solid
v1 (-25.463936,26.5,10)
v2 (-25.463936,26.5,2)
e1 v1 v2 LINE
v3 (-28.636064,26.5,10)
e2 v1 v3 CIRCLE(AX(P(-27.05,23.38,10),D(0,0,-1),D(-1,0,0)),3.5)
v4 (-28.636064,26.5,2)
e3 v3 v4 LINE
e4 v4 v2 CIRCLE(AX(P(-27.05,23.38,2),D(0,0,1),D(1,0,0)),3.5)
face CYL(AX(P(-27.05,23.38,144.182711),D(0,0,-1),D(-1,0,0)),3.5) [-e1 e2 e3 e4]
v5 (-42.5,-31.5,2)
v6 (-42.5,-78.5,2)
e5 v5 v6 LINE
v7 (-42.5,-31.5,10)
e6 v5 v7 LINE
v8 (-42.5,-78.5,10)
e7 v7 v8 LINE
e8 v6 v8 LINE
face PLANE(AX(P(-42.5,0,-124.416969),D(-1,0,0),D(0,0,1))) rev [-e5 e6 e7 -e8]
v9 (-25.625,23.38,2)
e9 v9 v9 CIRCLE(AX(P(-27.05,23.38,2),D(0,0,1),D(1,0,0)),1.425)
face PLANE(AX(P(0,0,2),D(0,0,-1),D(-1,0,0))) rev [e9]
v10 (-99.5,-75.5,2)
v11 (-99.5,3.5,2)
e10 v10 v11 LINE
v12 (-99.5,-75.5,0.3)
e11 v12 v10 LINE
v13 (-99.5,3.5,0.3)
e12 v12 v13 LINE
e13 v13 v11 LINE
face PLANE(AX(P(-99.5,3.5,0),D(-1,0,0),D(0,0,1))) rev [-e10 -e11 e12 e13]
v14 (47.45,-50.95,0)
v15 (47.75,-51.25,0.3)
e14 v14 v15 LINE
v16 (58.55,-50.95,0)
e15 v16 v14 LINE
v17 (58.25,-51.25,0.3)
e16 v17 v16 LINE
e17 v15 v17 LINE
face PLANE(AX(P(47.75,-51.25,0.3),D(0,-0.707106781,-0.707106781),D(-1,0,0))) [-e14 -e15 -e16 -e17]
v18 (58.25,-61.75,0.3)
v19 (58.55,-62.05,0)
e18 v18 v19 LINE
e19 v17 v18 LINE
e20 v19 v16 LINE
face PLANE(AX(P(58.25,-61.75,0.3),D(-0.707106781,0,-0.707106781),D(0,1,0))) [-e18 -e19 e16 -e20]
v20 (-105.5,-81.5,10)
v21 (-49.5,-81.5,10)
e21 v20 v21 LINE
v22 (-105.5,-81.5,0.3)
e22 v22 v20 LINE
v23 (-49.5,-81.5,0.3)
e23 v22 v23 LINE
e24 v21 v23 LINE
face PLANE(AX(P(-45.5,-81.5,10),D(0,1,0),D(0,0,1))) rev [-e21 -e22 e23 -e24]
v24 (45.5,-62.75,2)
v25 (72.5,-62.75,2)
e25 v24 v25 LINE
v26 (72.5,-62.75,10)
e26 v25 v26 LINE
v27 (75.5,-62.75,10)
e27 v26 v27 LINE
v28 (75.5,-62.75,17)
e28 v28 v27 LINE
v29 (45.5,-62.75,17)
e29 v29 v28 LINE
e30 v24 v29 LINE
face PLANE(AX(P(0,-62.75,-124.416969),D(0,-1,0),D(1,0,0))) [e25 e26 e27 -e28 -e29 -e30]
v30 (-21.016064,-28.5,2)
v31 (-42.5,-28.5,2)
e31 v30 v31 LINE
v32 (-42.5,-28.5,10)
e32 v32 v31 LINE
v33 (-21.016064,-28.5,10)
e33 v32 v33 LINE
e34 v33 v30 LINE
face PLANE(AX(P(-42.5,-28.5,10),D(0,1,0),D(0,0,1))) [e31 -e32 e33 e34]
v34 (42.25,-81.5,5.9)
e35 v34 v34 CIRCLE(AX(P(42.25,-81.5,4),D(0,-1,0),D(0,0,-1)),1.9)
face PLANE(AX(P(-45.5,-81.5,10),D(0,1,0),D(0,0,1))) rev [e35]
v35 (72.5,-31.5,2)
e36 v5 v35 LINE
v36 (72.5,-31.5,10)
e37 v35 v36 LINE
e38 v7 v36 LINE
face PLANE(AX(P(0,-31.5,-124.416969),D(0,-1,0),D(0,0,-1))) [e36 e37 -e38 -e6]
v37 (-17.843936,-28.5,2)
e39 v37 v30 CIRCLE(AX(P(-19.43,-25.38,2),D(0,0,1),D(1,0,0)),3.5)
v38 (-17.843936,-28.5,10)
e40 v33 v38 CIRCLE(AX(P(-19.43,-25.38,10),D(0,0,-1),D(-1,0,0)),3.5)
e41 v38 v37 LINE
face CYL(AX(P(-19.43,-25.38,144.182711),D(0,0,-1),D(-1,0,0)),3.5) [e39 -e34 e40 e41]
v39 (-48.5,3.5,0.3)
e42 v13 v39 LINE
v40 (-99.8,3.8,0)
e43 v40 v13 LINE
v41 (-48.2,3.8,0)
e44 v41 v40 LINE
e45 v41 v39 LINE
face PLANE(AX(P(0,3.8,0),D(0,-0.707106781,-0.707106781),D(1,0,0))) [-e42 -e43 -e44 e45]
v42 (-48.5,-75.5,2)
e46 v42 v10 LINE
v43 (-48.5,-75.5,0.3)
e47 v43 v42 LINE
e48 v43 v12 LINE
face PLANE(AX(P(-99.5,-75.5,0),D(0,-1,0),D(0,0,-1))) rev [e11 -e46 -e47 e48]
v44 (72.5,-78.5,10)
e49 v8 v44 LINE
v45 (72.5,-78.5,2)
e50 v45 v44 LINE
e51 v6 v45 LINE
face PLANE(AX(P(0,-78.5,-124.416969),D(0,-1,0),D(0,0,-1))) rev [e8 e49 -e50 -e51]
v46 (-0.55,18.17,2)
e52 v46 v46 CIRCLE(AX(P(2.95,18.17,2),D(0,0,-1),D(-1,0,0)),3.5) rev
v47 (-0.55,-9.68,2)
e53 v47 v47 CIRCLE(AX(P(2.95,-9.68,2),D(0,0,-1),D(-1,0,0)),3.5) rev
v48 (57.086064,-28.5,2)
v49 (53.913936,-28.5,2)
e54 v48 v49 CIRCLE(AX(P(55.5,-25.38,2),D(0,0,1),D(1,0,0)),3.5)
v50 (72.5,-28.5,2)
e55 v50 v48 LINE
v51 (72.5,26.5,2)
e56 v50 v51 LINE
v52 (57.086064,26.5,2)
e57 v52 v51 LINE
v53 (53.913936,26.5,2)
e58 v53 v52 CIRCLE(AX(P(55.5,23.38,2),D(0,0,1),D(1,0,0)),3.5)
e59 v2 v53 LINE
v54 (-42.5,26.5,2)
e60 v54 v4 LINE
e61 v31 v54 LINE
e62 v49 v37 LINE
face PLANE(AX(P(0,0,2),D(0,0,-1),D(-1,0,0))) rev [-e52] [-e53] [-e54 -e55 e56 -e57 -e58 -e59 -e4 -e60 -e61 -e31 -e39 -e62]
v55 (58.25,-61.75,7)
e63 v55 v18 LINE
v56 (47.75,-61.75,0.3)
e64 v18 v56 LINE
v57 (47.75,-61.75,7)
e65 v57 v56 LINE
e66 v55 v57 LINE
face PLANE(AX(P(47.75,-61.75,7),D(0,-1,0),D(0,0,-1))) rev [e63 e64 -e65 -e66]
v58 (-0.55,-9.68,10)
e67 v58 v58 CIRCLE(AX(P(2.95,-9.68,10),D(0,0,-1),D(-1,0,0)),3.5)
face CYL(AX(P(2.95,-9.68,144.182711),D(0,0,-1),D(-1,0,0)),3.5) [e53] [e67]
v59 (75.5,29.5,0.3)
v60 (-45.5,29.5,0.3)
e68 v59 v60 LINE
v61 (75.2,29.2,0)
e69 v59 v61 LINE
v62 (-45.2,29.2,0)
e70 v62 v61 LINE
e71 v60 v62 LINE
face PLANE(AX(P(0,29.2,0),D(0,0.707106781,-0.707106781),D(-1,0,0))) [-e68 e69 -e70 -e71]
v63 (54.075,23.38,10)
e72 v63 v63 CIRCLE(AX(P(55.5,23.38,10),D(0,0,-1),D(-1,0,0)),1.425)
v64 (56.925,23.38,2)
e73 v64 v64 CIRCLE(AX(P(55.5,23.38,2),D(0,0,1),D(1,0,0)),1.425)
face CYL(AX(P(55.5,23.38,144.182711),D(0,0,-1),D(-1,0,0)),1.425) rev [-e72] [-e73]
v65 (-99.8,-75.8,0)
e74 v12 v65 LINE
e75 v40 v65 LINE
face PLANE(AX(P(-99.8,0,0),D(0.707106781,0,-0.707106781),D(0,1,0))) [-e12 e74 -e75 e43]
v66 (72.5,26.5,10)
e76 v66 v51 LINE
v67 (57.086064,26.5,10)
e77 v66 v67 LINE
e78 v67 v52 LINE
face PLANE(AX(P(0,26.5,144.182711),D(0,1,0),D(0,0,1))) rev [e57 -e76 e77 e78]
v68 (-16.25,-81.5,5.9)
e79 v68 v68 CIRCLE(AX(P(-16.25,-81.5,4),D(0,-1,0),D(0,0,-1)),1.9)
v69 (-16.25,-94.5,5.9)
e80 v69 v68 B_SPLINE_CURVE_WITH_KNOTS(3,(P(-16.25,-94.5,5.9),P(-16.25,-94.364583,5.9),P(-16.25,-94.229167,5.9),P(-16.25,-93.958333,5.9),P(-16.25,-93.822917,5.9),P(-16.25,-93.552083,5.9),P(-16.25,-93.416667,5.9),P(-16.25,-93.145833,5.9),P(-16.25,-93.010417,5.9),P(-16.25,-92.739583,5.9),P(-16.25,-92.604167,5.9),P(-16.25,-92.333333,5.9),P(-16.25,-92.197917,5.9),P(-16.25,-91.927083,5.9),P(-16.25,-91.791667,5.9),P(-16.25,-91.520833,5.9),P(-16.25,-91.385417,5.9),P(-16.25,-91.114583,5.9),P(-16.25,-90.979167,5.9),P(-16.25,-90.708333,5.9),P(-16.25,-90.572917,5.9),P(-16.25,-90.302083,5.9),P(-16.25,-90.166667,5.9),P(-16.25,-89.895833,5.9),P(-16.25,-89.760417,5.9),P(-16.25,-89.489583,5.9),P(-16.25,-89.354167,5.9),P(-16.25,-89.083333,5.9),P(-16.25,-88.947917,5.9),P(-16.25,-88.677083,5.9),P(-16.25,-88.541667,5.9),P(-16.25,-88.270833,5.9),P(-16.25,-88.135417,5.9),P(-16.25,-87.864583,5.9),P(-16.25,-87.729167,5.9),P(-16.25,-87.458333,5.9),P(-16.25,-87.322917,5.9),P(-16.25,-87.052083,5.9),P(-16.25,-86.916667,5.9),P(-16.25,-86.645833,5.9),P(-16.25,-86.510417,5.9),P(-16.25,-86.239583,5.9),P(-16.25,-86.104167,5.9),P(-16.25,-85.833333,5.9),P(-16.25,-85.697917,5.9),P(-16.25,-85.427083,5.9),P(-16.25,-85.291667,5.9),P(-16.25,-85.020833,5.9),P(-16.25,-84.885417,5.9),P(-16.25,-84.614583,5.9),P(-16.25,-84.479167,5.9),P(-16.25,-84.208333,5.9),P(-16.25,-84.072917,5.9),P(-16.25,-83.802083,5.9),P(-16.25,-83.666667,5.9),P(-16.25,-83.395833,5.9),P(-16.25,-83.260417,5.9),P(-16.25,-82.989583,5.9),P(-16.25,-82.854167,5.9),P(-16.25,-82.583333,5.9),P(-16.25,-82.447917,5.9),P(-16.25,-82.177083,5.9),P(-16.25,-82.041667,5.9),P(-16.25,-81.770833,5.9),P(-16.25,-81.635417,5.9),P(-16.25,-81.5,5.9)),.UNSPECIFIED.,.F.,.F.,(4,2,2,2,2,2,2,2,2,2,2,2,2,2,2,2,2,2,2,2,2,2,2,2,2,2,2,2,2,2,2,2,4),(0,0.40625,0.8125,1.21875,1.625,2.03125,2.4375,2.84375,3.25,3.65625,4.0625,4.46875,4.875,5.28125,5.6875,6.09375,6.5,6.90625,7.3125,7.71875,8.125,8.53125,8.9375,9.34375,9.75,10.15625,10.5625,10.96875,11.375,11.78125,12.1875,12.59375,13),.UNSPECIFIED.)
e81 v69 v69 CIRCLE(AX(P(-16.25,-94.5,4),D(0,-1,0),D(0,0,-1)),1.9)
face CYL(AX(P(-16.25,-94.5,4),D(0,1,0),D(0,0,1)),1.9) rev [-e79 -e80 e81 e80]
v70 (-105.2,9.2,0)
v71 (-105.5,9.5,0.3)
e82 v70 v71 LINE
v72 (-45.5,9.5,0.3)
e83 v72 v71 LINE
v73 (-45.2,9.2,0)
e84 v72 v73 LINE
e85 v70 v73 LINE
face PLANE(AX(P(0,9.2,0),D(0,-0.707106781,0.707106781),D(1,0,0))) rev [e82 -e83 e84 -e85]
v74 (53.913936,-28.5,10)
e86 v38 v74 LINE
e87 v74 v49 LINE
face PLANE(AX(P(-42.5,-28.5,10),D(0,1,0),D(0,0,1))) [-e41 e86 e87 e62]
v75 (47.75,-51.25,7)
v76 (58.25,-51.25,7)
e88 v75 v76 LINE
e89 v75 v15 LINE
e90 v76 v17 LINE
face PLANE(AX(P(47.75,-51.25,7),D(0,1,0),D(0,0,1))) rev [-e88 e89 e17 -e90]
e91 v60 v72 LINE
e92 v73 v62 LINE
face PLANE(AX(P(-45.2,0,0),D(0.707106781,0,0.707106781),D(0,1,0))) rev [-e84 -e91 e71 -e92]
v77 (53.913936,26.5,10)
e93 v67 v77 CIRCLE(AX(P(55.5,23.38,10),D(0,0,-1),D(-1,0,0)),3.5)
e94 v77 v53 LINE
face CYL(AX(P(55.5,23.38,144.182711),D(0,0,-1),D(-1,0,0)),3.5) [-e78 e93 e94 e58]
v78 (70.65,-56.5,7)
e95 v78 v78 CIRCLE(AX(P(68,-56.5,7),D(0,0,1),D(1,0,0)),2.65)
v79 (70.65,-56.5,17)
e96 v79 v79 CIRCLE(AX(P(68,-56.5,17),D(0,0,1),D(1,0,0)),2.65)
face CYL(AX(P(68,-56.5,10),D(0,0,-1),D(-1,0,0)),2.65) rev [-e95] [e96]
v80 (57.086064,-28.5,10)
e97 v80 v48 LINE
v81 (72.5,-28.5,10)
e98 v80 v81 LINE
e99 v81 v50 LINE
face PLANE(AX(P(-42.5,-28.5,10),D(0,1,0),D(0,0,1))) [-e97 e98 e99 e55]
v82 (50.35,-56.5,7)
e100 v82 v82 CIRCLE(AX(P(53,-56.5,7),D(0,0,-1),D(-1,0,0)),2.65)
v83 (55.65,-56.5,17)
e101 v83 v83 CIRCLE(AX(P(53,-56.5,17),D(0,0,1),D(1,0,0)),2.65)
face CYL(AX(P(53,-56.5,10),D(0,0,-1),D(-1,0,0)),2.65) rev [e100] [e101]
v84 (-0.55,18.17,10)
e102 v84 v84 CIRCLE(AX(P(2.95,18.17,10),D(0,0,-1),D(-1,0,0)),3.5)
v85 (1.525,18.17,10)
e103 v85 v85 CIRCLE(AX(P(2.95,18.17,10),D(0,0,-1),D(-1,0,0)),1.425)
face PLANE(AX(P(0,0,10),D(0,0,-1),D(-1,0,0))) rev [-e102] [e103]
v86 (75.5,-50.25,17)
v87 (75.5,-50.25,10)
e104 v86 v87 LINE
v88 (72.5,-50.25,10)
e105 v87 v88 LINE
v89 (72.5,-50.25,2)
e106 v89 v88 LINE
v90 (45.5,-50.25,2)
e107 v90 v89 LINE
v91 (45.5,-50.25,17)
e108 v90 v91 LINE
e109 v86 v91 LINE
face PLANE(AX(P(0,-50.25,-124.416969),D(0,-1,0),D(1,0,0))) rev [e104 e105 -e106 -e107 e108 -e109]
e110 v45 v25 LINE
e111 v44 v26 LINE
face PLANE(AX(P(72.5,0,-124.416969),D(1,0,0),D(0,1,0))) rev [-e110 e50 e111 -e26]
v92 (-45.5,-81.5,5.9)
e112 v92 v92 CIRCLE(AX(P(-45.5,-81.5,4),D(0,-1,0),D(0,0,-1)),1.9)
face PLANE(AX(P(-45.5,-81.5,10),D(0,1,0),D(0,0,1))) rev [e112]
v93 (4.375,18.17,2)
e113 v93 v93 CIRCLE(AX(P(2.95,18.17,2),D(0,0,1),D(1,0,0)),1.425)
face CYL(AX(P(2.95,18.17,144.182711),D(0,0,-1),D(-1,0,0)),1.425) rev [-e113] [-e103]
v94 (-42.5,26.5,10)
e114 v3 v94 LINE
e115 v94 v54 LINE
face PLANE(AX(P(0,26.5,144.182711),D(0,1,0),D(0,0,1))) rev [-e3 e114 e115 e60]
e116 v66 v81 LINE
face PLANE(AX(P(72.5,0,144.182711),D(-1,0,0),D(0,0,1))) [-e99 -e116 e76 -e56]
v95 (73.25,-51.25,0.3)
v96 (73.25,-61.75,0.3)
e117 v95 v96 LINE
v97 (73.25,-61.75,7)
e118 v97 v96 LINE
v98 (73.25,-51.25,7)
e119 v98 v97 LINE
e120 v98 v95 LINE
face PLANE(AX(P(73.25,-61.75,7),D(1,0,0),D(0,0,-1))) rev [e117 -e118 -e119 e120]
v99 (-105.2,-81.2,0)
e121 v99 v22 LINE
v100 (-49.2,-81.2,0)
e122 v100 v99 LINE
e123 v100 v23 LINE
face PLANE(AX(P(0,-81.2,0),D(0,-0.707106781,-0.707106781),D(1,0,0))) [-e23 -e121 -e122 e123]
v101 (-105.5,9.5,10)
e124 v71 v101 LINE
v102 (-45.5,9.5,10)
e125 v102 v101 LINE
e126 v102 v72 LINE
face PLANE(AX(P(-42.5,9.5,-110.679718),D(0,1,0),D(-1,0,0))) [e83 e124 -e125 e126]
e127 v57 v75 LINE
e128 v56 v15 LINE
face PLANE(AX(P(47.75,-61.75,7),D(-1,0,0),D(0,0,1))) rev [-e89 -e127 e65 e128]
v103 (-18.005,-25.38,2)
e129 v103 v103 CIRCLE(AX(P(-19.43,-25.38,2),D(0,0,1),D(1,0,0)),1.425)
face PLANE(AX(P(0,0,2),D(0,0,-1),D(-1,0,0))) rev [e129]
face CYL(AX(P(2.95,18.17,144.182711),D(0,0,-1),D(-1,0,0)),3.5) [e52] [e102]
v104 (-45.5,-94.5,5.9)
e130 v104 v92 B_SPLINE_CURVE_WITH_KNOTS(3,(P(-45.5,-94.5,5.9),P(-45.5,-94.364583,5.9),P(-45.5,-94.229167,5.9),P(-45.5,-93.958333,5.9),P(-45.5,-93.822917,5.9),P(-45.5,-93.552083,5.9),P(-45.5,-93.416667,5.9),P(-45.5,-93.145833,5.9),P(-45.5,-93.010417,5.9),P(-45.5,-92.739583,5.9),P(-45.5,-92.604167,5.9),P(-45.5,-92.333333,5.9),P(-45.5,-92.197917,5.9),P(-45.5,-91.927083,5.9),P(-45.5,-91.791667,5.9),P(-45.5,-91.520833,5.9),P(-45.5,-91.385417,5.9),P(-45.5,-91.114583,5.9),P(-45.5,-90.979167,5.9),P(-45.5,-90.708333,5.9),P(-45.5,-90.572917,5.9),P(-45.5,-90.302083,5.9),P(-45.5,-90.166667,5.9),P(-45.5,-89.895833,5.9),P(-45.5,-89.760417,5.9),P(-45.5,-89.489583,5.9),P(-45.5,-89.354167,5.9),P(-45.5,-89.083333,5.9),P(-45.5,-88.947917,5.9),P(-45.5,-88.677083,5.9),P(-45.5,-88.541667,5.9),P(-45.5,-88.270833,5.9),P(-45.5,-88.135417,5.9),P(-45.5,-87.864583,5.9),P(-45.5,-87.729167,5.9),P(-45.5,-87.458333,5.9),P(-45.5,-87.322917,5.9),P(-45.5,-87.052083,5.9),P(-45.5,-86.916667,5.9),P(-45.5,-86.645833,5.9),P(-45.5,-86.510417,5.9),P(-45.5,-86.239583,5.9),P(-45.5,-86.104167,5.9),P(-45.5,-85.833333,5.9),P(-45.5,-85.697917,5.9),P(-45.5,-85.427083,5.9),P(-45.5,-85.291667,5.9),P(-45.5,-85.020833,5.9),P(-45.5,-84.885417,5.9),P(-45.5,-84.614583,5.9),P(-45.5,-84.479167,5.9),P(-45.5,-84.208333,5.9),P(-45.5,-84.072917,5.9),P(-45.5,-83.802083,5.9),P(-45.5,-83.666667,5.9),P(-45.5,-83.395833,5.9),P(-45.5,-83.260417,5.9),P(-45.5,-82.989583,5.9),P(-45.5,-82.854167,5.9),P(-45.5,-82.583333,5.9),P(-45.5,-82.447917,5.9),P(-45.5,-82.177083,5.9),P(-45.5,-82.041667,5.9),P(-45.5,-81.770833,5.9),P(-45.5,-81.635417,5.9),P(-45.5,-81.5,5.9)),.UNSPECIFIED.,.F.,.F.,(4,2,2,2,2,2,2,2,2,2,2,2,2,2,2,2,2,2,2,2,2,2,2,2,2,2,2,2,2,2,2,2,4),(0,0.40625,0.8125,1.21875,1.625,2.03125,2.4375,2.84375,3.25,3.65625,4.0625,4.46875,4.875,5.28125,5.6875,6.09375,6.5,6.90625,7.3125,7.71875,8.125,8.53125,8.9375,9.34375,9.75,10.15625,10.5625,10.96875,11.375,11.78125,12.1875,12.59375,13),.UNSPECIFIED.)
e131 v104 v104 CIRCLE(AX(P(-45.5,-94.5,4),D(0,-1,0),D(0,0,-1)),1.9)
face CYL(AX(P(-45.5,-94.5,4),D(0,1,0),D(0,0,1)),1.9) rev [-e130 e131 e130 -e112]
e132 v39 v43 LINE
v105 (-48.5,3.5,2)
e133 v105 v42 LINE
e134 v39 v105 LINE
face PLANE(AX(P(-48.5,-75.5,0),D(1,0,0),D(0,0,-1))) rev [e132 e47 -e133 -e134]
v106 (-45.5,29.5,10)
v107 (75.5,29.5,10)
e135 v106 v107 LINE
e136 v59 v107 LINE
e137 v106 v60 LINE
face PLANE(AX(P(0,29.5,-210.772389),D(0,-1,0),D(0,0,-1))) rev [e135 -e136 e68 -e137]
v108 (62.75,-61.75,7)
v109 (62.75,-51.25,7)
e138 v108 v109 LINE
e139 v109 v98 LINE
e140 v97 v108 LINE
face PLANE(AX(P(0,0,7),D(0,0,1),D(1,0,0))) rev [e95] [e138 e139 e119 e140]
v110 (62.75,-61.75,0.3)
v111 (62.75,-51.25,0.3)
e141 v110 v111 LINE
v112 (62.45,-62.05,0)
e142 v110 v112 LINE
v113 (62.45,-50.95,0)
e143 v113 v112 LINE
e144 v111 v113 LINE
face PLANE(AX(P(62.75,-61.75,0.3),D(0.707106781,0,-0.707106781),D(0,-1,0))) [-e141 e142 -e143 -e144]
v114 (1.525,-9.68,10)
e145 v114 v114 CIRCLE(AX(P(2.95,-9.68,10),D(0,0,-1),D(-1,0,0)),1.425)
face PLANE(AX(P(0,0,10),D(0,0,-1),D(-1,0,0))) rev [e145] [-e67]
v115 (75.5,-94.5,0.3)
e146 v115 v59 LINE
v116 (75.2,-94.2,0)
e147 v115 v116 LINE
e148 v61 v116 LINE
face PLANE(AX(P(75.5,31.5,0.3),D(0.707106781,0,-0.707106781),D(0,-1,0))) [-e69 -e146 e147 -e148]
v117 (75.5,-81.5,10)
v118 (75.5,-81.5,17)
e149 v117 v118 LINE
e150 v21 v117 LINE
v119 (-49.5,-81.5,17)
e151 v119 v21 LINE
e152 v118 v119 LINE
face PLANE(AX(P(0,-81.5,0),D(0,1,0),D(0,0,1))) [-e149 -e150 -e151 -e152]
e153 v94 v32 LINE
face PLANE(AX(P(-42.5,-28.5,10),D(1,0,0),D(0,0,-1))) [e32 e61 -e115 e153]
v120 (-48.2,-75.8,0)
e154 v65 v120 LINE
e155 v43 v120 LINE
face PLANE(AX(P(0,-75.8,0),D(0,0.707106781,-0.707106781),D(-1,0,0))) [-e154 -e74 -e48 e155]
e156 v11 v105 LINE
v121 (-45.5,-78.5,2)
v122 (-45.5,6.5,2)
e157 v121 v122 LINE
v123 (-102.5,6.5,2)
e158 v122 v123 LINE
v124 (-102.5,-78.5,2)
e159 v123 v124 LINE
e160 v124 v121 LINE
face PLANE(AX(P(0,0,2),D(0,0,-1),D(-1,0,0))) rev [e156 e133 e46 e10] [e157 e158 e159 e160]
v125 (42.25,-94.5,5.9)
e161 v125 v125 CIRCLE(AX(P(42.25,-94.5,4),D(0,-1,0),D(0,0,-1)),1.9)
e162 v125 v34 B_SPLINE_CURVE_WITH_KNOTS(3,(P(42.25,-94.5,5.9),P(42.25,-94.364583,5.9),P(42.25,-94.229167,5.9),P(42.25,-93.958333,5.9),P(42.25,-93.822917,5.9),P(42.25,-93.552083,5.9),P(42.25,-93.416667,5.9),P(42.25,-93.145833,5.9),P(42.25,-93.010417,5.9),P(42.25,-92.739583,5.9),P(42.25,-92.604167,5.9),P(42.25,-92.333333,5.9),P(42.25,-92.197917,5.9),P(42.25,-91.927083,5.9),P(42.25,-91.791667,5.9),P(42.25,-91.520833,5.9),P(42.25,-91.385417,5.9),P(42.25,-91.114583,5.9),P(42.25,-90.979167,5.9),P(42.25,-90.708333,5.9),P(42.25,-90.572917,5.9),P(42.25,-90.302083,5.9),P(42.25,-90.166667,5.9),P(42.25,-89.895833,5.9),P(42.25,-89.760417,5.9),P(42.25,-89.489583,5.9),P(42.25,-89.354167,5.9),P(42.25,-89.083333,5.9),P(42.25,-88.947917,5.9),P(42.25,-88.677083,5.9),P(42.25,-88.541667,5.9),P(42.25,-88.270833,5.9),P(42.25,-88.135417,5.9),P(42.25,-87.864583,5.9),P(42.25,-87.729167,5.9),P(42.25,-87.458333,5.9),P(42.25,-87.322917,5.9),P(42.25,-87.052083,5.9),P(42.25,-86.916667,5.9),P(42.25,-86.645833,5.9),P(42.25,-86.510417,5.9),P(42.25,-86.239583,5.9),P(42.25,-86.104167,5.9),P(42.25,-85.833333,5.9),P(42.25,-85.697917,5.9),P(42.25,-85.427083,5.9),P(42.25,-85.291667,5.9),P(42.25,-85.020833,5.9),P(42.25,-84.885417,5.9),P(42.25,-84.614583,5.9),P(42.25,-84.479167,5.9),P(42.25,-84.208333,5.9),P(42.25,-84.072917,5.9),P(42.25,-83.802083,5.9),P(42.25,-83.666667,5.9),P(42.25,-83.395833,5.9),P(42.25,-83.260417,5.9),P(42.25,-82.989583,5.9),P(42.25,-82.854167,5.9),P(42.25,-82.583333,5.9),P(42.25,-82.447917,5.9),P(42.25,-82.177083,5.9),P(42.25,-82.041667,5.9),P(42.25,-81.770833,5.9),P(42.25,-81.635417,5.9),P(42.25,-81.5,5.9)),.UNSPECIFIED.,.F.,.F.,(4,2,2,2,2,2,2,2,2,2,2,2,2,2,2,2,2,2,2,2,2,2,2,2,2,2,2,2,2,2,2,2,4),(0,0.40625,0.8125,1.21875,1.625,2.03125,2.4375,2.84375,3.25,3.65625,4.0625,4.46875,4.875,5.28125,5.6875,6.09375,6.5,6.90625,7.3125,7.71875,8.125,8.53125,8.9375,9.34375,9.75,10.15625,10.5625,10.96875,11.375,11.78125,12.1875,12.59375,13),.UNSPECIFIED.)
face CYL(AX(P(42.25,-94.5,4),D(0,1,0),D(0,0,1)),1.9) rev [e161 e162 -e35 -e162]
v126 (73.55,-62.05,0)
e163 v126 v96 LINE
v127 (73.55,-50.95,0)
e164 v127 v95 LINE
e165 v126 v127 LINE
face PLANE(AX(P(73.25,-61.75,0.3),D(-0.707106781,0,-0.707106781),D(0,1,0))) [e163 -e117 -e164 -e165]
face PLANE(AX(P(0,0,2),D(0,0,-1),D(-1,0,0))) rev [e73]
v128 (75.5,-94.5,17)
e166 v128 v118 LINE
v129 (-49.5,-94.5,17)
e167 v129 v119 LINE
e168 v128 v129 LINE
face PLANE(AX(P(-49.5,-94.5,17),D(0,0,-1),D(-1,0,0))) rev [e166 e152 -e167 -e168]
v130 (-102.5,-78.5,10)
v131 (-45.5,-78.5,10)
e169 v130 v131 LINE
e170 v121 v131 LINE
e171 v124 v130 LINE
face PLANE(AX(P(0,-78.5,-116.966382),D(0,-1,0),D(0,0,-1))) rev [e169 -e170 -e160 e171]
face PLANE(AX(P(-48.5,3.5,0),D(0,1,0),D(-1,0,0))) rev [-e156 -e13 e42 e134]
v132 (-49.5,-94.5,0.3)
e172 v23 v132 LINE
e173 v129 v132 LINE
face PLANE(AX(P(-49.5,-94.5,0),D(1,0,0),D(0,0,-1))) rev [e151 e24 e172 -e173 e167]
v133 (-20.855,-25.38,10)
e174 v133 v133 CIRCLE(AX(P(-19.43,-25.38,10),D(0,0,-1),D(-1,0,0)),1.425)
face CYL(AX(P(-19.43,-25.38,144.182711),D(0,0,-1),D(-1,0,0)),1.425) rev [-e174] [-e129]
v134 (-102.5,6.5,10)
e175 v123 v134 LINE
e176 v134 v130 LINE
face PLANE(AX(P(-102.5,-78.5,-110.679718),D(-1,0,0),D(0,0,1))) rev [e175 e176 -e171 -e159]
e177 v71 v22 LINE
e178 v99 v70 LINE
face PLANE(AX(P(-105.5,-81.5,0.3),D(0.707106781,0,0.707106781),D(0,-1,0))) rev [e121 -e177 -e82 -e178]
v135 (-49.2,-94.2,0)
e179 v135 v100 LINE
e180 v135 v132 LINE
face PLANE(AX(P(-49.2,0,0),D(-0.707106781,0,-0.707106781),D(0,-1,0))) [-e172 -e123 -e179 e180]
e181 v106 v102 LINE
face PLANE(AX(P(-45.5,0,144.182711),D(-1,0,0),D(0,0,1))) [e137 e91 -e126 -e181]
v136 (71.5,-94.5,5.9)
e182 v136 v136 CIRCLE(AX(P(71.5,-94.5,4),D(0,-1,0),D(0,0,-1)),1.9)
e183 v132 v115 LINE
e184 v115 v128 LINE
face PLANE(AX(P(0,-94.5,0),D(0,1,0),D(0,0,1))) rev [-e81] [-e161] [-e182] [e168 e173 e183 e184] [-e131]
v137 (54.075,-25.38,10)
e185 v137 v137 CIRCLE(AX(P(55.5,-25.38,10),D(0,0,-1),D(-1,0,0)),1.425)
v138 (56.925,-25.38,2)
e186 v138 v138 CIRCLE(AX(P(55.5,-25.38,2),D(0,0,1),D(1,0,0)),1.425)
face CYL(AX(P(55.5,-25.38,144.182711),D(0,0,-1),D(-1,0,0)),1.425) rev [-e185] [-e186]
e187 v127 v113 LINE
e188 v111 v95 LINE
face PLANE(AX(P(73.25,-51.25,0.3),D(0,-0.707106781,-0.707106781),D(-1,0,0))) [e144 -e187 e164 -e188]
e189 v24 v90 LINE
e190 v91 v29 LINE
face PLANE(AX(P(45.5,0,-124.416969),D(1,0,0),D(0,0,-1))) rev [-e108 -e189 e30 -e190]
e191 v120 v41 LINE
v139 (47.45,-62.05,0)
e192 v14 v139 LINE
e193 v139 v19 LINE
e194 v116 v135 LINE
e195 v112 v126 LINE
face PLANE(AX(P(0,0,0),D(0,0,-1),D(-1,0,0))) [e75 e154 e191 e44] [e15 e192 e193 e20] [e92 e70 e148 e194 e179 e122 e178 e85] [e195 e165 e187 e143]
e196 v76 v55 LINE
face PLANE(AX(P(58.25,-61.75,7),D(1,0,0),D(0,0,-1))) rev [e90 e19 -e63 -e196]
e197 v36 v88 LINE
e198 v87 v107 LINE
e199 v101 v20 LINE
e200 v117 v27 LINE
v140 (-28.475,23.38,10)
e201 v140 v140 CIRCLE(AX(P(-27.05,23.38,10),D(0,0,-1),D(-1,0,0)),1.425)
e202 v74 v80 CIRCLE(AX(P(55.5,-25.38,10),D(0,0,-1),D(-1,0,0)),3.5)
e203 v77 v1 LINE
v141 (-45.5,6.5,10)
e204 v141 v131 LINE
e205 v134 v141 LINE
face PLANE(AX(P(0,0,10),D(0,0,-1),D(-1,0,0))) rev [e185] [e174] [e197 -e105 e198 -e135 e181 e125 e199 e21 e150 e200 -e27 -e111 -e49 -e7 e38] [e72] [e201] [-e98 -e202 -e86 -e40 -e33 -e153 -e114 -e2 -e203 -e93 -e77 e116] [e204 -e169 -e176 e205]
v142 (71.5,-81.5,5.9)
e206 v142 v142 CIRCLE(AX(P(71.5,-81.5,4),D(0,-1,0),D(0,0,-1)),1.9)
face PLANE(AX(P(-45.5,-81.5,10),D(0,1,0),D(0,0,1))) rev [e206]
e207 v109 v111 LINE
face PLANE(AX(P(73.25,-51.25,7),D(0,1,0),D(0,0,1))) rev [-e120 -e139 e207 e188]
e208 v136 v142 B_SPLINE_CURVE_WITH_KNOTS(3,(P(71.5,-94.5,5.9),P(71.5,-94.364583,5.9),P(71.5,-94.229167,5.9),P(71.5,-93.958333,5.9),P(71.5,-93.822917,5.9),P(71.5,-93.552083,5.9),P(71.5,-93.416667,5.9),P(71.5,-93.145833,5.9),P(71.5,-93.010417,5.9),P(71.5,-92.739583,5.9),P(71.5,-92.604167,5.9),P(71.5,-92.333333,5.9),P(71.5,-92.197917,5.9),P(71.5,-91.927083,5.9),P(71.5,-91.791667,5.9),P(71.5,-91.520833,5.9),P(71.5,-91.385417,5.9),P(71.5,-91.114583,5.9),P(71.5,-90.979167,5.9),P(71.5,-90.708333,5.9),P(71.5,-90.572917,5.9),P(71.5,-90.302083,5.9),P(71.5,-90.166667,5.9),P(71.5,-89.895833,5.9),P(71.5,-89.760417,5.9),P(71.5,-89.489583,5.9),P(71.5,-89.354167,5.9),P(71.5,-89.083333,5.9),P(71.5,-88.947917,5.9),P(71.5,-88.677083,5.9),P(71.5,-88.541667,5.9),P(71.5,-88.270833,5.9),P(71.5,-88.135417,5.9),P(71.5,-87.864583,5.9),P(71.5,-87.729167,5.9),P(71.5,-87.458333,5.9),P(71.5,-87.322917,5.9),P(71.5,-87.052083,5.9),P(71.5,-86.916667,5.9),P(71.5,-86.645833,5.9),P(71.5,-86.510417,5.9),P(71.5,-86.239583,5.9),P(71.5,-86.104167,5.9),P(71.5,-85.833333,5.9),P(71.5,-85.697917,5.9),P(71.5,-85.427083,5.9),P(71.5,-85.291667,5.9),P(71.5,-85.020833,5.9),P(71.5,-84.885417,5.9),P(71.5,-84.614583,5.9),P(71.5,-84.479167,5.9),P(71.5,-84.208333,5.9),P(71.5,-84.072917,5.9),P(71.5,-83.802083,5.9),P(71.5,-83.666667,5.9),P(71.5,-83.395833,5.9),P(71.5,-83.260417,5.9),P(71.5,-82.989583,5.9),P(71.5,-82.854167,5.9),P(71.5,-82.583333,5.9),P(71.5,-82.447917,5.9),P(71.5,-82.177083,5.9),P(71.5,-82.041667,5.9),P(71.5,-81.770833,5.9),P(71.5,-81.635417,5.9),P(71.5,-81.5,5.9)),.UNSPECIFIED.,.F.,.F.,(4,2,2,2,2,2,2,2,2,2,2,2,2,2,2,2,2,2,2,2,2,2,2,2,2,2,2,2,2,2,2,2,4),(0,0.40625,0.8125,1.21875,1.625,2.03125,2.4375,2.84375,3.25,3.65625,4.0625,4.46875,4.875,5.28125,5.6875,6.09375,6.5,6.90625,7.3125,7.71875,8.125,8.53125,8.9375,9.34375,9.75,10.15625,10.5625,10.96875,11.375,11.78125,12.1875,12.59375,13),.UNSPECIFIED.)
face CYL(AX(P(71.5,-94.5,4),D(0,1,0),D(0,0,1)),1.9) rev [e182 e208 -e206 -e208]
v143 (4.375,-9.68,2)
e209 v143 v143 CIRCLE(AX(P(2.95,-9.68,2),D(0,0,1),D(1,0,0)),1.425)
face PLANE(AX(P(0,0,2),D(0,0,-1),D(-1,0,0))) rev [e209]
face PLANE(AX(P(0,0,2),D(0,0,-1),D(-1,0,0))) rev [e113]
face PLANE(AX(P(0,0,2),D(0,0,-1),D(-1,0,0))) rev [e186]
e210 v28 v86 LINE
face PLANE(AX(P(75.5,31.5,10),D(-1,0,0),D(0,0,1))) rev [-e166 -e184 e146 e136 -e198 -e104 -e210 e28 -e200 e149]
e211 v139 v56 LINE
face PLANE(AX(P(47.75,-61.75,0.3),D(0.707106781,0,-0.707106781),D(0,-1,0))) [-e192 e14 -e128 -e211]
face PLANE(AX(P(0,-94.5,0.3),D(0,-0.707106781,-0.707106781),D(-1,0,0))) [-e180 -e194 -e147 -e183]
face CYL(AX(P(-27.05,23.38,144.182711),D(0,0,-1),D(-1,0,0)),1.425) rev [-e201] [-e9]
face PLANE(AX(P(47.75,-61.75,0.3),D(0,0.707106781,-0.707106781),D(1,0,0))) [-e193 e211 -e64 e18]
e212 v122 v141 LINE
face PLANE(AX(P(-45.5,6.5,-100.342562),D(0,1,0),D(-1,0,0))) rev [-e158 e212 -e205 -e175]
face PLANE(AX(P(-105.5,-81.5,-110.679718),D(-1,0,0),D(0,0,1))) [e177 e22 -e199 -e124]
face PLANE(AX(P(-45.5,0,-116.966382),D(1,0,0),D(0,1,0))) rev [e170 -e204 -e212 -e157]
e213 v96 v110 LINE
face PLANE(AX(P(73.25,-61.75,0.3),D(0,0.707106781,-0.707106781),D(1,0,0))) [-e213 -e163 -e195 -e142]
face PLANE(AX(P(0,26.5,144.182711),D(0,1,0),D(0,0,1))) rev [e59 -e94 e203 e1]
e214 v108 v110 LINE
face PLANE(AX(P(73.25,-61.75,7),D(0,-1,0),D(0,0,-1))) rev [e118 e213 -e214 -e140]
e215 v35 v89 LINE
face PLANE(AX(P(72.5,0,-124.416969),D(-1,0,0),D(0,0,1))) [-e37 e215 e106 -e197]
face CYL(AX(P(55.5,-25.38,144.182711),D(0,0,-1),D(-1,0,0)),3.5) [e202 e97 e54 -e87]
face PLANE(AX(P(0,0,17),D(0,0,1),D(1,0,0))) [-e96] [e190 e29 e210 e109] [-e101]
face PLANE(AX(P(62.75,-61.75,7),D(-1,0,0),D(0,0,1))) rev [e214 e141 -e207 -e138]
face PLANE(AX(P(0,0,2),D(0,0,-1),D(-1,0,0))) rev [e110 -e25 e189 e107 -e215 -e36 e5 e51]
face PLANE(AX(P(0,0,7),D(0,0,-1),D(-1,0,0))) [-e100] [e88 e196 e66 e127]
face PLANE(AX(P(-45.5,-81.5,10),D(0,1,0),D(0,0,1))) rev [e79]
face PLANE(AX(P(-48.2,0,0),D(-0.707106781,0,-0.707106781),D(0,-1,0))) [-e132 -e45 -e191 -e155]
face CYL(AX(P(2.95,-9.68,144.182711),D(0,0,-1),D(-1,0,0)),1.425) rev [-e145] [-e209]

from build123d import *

# Parameters (mm, degrees)
SKETCH1_W                = 121
SKETCH1_H                = 113
SKETCH1_R                = 2.65
SKETCH1_R_2              = 1.425
SKETCH1_W_2              = 85
SKETCH1_H_2              = 57
BOSS_EXTRUDE1_DEPTH      = 10
SKETCH2_W                = 85
SKETCH2_H                = 57
BOSS_EXTRUDE2_DEPTH      = 2
SKETCH4_W                = 27
SKETCH4_H                = 45.5
CUT_EXTRUDE1_DEPTH       = 8
SKETCH5_W                = 10.5
SKETCH5_H                = 10.5
CUT_EXTRUDE2_DEPTH       = 7
SKETCH7_R                = 3
SKETCH7_R_2              = 1.425
SKETCH7_W                = 30
SKETCH7_H                = 12.5
SKETCH7_R_3              = 2.65
BOSS_EXTRUDE4_DEPTH      = 7
CHAMFER2_SIZE            = 2
CHAMFER2_SIZE_2          = 7
SKETCH9_W                = 55
SKETCH9_H                = 113
BOSS_EXTRUDE5_DEPTH      = 17
SKETCH10_R               = 1.425
CUT_EXTRUDE3_DEPTH       = 131.504789184
SKETCH11_W               = 52
SKETCH11_H               = 107
SKETCH11_R               = 3.5
CUT_EXTRUDE4_DEPTH       = 15
SKETCH12_W               = 55
SKETCH12_H               = 113
SKETCH12_R               = 3.5
CUT_EXTRUDE5_DEPTH       = 7
SKETCH13_W               = 125
SKETCH13_H               = 17
SKETCH13_R               = 1.9
BOSS_EXTRUDE6_DEPTH      = 13
SKETCH16_W               = 57
SKETCH16_H               = 85
CUT_EXTRUDE7_DEPTH       = 15
BOSS_EXTRUDE8_REACH      = 140.313
SKETCH17_W               = 63
SKETCH17_H               = 91
SKETCH17_W_2             = 57
SKETCH17_H_2             = 85
CUT_EXTRUDE8_DEPTH       = 142.987675522
CUT_EXTRUDE8_DEPTH_BACK  = 142.987675522
SKETCH18_W               = 181
SKETCH18_H               = 22
SKETCH19_W               = 118
SKETCH19_H               = 38
CUT_EXTRUDE9_DEPTH       = 15
SKETCH20_W               = 27
SKETCH20_H               = 3
BOSS_EXTRUDE9_DEPTH      = 8
BOSS_EXTRUDE10_START     = -2
SKETCH21_W               = 118
SKETCH21_H               = 38
SKETCH21_R               = 1.425
SKETCH21_W_2             = 60
SKETCH21_H_2             = 20
SKETCH21_W_3             = 56
SKETCH21_H_3             = 13
BOSS_EXTRUDE10_DEPTH     = 2
SKETCH23_R               = 1.425
SKETCH23_R_2             = 3.5
BOSS_EXTRUDE11_DEPTH     = 8
CUT_EXTRUDE10_DEPTH      = 142.987675522
CUT_EXTRUDE10_DEPTH_BACK = 142.987675522
SKETCH24_W               = 60
SKETCH24_H               = 20
SKETCH24_W_2             = 56
SKETCH24_H_2             = 13
SKETCH24_W_3             = 51
SKETCH24_H_3             = 79
CHAMFER3_SIZE            = 0.3


with BuildPart() as part:
    # Sketch1 → Boss-Extrude1 (new body)
    with BuildSketch(Plane.XY):
        with Locations((15, -25)):
            Rectangle(SKETCH1_W, SKETCH1_H)
        with Locations((68, -56.5)):
            Circle(SKETCH1_R, mode=Mode.SUBTRACT)
        with Locations((53, -56.5)):
            Circle(SKETCH1_R, mode=Mode.SUBTRACT)
        with Locations((51, -21.5)):
            Circle(SKETCH1_R_2, mode=Mode.SUBTRACT)
        with Locations((68, -21.5)):
            Circle(SKETCH1_R_2, mode=Mode.SUBTRACT)
        Rectangle(SKETCH1_W_2, SKETCH1_H_2, mode=Mode.SUBTRACT)
    extrude(amount=BOSS_EXTRUDE1_DEPTH)

    # Sketch2 → Boss-Extrude2 (add)
    with BuildSketch(Plane(origin=(0, 0, 0), x_dir=(-1, 0, 0), z_dir=(0, 0, -1))):
        Rectangle(SKETCH2_W, SKETCH2_H)
    extrude(amount=-BOSS_EXTRUDE2_DEPTH)

    # Sketch4 → Cut-Extrude1 (cut)
    with BuildSketch(Plane.XY.offset(10)):
        with Locations((59, 5.75)):
            Rectangle(SKETCH4_W, SKETCH4_H)
        Polygon((45.5, -31.5), (-42.5, -31.5), (-42.5, -78.5), (72.5, -78.5), (72.5, -62.75), (45.5, -62.75), (45.5, -50.25), (72.5, -50.25), (72.5, -26), (45.5, -26), align=None)
    extrude(amount=-CUT_EXTRUDE1_DEPTH, mode=Mode.SUBTRACT)

    # Sketch5 → Cut-Extrude2 (cut)
    with BuildSketch(Plane(origin=(0, 0, 0), x_dir=(-1, 0, 0), z_dir=(0, 0, -1))):
        with Locations((-68, -56.5)):
            Rectangle(SKETCH5_W, SKETCH5_H)
        with Locations((-53, -56.5)):
            Rectangle(SKETCH5_W, SKETCH5_H)
    extrude(amount=-CUT_EXTRUDE2_DEPTH, mode=Mode.SUBTRACT)

    # Sketch7 → Boss-Extrude4 (add)
    # profile 1 of 3: a face of its own
    with BuildSketch(Plane.XY.offset(10)):
        with Locations(Location((51, -21.5, 0), (0, 0, 180))):
            Circle(SKETCH7_R)
        with Locations((51, -21.5)):
            Circle(SKETCH7_R_2, mode=Mode.SUBTRACT)
    # profile 2 of 3: a face of its own
    with BuildSketch(Plane.XY.offset(10)):
        with Locations(Location((68, -21.5, 0), (0, 0, 180))):
            Circle(SKETCH7_R)
        with Locations((68, -21.5)):
            Circle(SKETCH7_R_2, mode=Mode.SUBTRACT)
    # profile 3 of 3: a face of its own
    with BuildSketch(Plane.XY.offset(10)):
        with Locations((60.5, -56.5)):
            Rectangle(SKETCH7_W, SKETCH7_H)
        with Locations(Location((53, -56.5, 0), (0, 0, 180))):
            Circle(SKETCH7_R_3, mode=Mode.SUBTRACT)
        with Locations((68, -56.5)):
            Circle(SKETCH7_R_3, mode=Mode.SUBTRACT)
    extrude(amount=BOSS_EXTRUDE4_DEPTH)

    # Chamfer2
    # the kernel refuses this chamfer: 7, 2 mm, written as the material it adds along each edge
    with BuildSketch(Plane(origin=(51, -21.5, 10), x_dir=(-1, 0, 0), z_dir=(0, 1, 0))) as chamfer2_piece_1_section:
        Polygon((3 + CHAMFER2_SIZE, 0), (3, CHAMFER2_SIZE_2), (3, 0), align=None)
    chamfer2_piece_1 = revolve(axis=Axis((51, -21.5, 10), (0, 0, 1)), mode=Mode.PRIVATE)
    chamfer2_piece_1 = split(chamfer2_piece_1, bisect_by=Plane(origin=(54.98341161, -26, 13.349658262), z_dir=(0, 1, 0)), keep=Keep.TOP, mode=Mode.PRIVATE)
    chamfer2_piece_1 = split(chamfer2_piece_1, bisect_by=Plane(origin=(54.98341161, -17, 13.349658262), z_dir=(0, -1, 0)), keep=Keep.TOP, mode=Mode.PRIVATE)
    chamfer2_piece_1 = split(chamfer2_piece_1, bisect_by=Plane(origin=(54.98341161, -21.5, 17), z_dir=(0, 0, -1)), keep=Keep.TOP, mode=Mode.PRIVATE)
    add(chamfer2_piece_1)
    with BuildSketch(Plane(origin=(68, -21.5, 10), x_dir=(-1, 0, 0), z_dir=(0, 1, 0))) as chamfer2_piece_2_section:
        Polygon((3 + CHAMFER2_SIZE, 0), (3, CHAMFER2_SIZE_2), (3, 0), align=None)
    chamfer2_piece_2 = revolve(axis=Axis((68, -21.5, 10), (0, 0, 1)), mode=Mode.PRIVATE)
    chamfer2_piece_2 = split(chamfer2_piece_2, bisect_by=Plane(origin=(71.983411611, -26, 13.349658263), z_dir=(0, 1, 0)), keep=Keep.TOP, mode=Mode.PRIVATE)
    chamfer2_piece_2 = split(chamfer2_piece_2, bisect_by=Plane(origin=(71.983411611, -17, 13.349658263), z_dir=(0, -1, 0)), keep=Keep.TOP, mode=Mode.PRIVATE)
    chamfer2_piece_2 = split(chamfer2_piece_2, bisect_by=Plane(origin=(71.983411611, -21.5, 17), z_dir=(0, 0, -1)), keep=Keep.TOP, mode=Mode.PRIVATE)
    add(chamfer2_piece_2)

    # Sketch9 → Boss-Extrude5 (add)
    with BuildSketch(Plane(origin=(0, 0, 0), x_dir=(-1, 0, 0), z_dir=(0, 0, -1))):
        with Locations((73, -25)):
            Rectangle(SKETCH9_W, SKETCH9_H)
    extrude(amount=-BOSS_EXTRUDE5_DEPTH)

    # Sketch10 → Cut-Extrude3 (cut, through all)
    with BuildSketch(Plane.XY.offset(17)):
        with Locations((-90.5, -13.5)):
            Circle(SKETCH10_R)
        with Locations((-50.5, -13.5)):
            Circle(SKETCH10_R)
        with Locations((-90.5, -73.5)):
            Circle(SKETCH10_R)
        with Locations((-50.5, -73.5)):
            Circle(SKETCH10_R)
    extrude(amount=-CUT_EXTRUDE3_DEPTH, mode=Mode.SUBTRACT)

    # Sketch11 → Cut-Extrude4 (cut)
    with BuildSketch(Plane.XY.offset(17)):
        with Locations((-71.5, -25)):
            Rectangle(SKETCH11_W, SKETCH11_H)
        with Locations((-50.5, -73.5)):
            Circle(SKETCH11_R, mode=Mode.SUBTRACT)
        with Locations((-50.5, -13.5)):
            Circle(SKETCH11_R, mode=Mode.SUBTRACT)
        with Locations((-90.5, -73.5)):
            Circle(SKETCH11_R, mode=Mode.SUBTRACT)
        with Locations((-90.5, -13.5)):
            Circle(SKETCH11_R, mode=Mode.SUBTRACT)
    extrude(amount=-CUT_EXTRUDE4_DEPTH, mode=Mode.SUBTRACT)

    # Sketch12 → Cut-Extrude5 (cut)
    with BuildSketch(Plane.XY.offset(17)):
        with Locations((-73, -25)):
            Rectangle(SKETCH12_W, SKETCH12_H)
        with Locations((-90.5, -13.5)):
            Circle(SKETCH12_R, mode=Mode.SUBTRACT)
        with Locations((-50.5, -13.5)):
            Circle(SKETCH12_R, mode=Mode.SUBTRACT)
        with Locations((-90.5, -73.5)):
            Circle(SKETCH12_R, mode=Mode.SUBTRACT)
        with Locations((-50.5, -73.5)):
            Circle(SKETCH12_R, mode=Mode.SUBTRACT)
    extrude(amount=-CUT_EXTRUDE5_DEPTH, mode=Mode.SUBTRACT)

    # Sketch13 → Boss-Extrude6 (add)
    with BuildSketch(Plane.XZ.offset(81.5)):
        with Locations((13, 8.5)):
            Rectangle(SKETCH13_W, SKETCH13_H)
        with Locations(Location((-16.25, 4, 0), (0, 0, 90))):
            Circle(SKETCH13_R, mode=Mode.SUBTRACT)
        with Locations(Location((42.25, 4, 0), (0, 0, 90))):
            Circle(SKETCH13_R, mode=Mode.SUBTRACT)
        with Locations(Location((71.5, 4, 0), (0, 0, 90))):
            Circle(SKETCH13_R, mode=Mode.SUBTRACT)
        with Locations(Location((-45.5, 4, 0), (0, 0, 90))):
            Circle(SKETCH13_R, mode=Mode.SUBTRACT)
    extrude(amount=BOSS_EXTRUDE6_DEPTH)

    # Sketch16 → Cut-Extrude7 (cut)
    with BuildSketch(Plane.XY.offset(17)):
        with Locations((-74, -36)):
            Rectangle(SKETCH16_W, SKETCH16_H)
    extrude(amount=-CUT_EXTRUDE7_DEPTH, mode=Mode.SUBTRACT)

    # Boss-Extrude8: up to this face of the body (flat: up to its plane)
    boss_extrude8_end = Plane(part.part.faces().sort_by_distance((-11.281306372, -29.469785965, 0))[0])
    # Sketch17 → Boss-Extrude8 (add, up to the picked face)
    with BuildSketch(Plane.XY.offset(10), mode=Mode.PRIVATE) as boss_extrude8_sk1:
        with Locations((-74, -36)):
            Rectangle(SKETCH17_W, SKETCH17_H)
        with Locations((-74, -36)):
            Rectangle(SKETCH17_W_2, SKETCH17_H_2, mode=Mode.SUBTRACT)
    boss_extrude8_tool1 = split(extrude(boss_extrude8_sk1.sketch, amount=-BOSS_EXTRUDE8_REACH, mode=Mode.PRIVATE), bisect_by=boss_extrude8_end, keep=Keep.BOTH, mode=Mode.PRIVATE)
    add(boss_extrude8_tool1.solids().sort_by(Axis((-43.606797, -36, 10), (0, 0, -1)))[0])

    # Sketch18 → Cut-Extrude8 (cut, two sides: drawn at the far end of the back side and taken through both)
    with BuildSketch(Plane.XY.offset(10).offset(-CUT_EXTRUDE8_DEPTH_BACK)):
        with Locations((-15, 20.5)):
            Rectangle(SKETCH18_W, SKETCH18_H)
    extrude(amount=CUT_EXTRUDE8_DEPTH + CUT_EXTRUDE8_DEPTH_BACK, mode=Mode.SUBTRACT)

    # Sketch19 → Cut-Extrude9 (cut)
    with BuildSketch(Plane.XY.offset(17)):
        with Locations((16.5, -9.5)):
            Rectangle(SKETCH19_W, SKETCH19_H)
    extrude(amount=-CUT_EXTRUDE9_DEPTH, mode=Mode.SUBTRACT)

    # Sketch20 → Boss-Extrude9 (add)
    with BuildSketch(Plane.XY.offset(10)):
        with Locations((59, -30)):
            Rectangle(SKETCH20_W, SKETCH20_H)
    extrude(amount=-BOSS_EXTRUDE9_DEPTH)

    # Sketch21 → Boss-Extrude10 (add)
    # profile 1 of 7: a face of its own
    with BuildSketch(Plane.XY.offset(2).offset(BOSS_EXTRUDE10_START)):
        with Locations((16.5, -9.5)):
            Rectangle(SKETCH21_W, SKETCH21_H)
        with Locations((68, -21.5)):
            Circle(SKETCH21_R, mode=Mode.SUBTRACT)
        with Locations((51, -21.5)):
            Circle(SKETCH21_R, mode=Mode.SUBTRACT)
    # profile 2 of 7: a face of its own
    with BuildSketch(Plane.XY.offset(2).offset(BOSS_EXTRUDE10_START)):
        Polygon((-45.5, 6.5), (-45.5, -31.5), (75.5, -31.5), (75.5, -28.5), (-42.5, -28.5), (-42.5, 9.5), (75.5, 9.5), (75.5, 29.5), (-45.5, 29.5), (-45.5, 9.5), align=None)
    # profile 3 of 7: a face of its own
    with BuildSketch(Plane.XY.offset(2).offset(BOSS_EXTRUDE10_START)):
        with Locations((68, -21.5)):
            Circle(SKETCH21_R)
    # profile 4 of 7: a face of its own
    with BuildSketch(Plane.XY.offset(2).offset(BOSS_EXTRUDE10_START)):
        with Locations((51, -21.5)):
            Circle(SKETCH21_R)
    # profile 5 of 7: a face of its own
    with BuildSketch(Plane.XY.offset(2).offset(BOSS_EXTRUDE10_START)):
        with Locations((-75.5, 19.5)):
            Rectangle(SKETCH21_W_2, SKETCH21_H_2)
    # profile 6 of 7: a face of its own
    with BuildSketch(Plane.XY.offset(2).offset(BOSS_EXTRUDE10_START)):
        with Locations((-77.5, -88)):
            Rectangle(SKETCH21_W_3, SKETCH21_H_3)
    # profile 7 of 7: a face of its own
    with BuildSketch(Plane.XY.offset(2).offset(BOSS_EXTRUDE10_START)):
        Polygon((-45.5, -78.5), (-45.5, -31.5), (-45.5, 6.5), (-102.5, 6.5), (-102.5, -78.5), align=None)
    extrude(amount=BOSS_EXTRUDE10_DEPTH)

    # Sketch23 → Boss-Extrude11 (add)
    # profile 1 of 9: a face of its own
    with BuildSketch(Plane.XY.offset(2)):
        with BuildLine():
            Line((-45.5, 29.5), (-45.5, 9.5))
            Line((-45.5, 9.5), (-42.5, 9.5))
            Line((-42.5, 9.5), (-42.5, 26.5))
            Line((-42.5, 26.5), (-28.636064311, 26.5))
            ThreePointArc((-28.636064311, 26.5), (-27.05, 26.88), (-25.463935689, 26.5))
            Line((-25.463935689, 26.5), (53.913935689, 26.5))
            ThreePointArc((53.913935689, 26.5), (55.5, 26.88), (57.086064311, 26.5))
            Line((57.086064311, 26.5), (72.5, 26.5))
            Line((72.5, 26.5), (72.5, -28.5))
            Line((72.5, -28.5), (75.5, -28.5))
            Line((75.5, -28.5), (75.5, 29.5))
            Line((75.5, 29.5), (-45.5, 29.5))
        make_face()
    # profile 2 of 9: a face of its own
    with BuildSketch(Plane.XY.offset(2)):
        with BuildLine():
            Line((-25.463935689, 26.5), (-28.636064311, 26.5))
            ThreePointArc((-28.636064311, 26.5), (-28.88013318, 20.396610561), (-23.55, 23.38))
            ThreePointArc((-23.55, 23.38), (-24.066610561, 25.21013318), (-25.463935689, 26.5))
        make_face()
        with Locations(Location((-27.05, 23.38, 0), (0, 0, 180))):
            Circle(SKETCH23_R, mode=Mode.SUBTRACT)
    # profile 3 of 9: a face of its own
    with BuildSketch(Plane.XY.offset(2)):
        with Locations(Location((2.95, 18.17, 0), (0, 0, 180))):
            Circle(SKETCH23_R_2)
        with Locations(Location((2.95, 18.17, 0), (0, 0, 180))):
            Circle(SKETCH23_R, mode=Mode.SUBTRACT)
    # profile 4 of 9: a face of its own
    with BuildSketch(Plane.XY.offset(2)):
        with BuildLine():
            ThreePointArc((59, 23.38), (58.483389439, 25.21013318), (57.086064311, 26.5))
            Line((57.086064311, 26.5), (53.913935689, 26.5))
            ThreePointArc((53.913935689, 26.5), (53.66986682, 20.396610561), (59, 23.38))
        make_face()
        with Locations(Location((55.5, 23.38, 0), (0, 0, 180))):
            Circle(SKETCH23_R, mode=Mode.SUBTRACT)
    # profile 5 of 9: a face of its own
    with BuildSketch(Plane.XY.offset(2)):
        with Locations(Location((2.95, -9.68, 0), (0, 0, 180))):
            Circle(SKETCH23_R_2)
        with Locations(Location((2.95, -9.68, 0), (0, 0, 180))):
            Circle(SKETCH23_R, mode=Mode.SUBTRACT)
    # profile 6 of 9: a face of its own
    with BuildSketch(Plane.XY.offset(2)):
        with BuildLine():
            ThreePointArc((-15.93, -25.38), (-21.26013318, -22.396610561), (-21.016064311, -28.5))
            Line((-21.016064311, -28.5), (-17.843935689, -28.5))
            ThreePointArc((-17.843935689, -28.5), (-16.446610561, -27.21013318), (-15.93, -25.38))
        make_face()
        with Locations(Location((-19.43, -25.38, 0), (0, 0, 180))):
            Circle(SKETCH23_R, mode=Mode.SUBTRACT)
    # profile 7 of 9: a face of its own
    with BuildSketch(Plane.XY.offset(2)):
        with BuildLine():
            Line((53.913935689, -28.5), (57.086064311, -28.5))
            ThreePointArc((57.086064311, -28.5), (58.483389439, -27.21013318), (59, -25.38))
            ThreePointArc((59, -25.38), (53.66986682, -22.396610561), (53.913935689, -28.5))
        make_face()
        with Locations(Location((55.5, -25.38, 0), (0, 0, 180))):
            Circle(SKETCH23_R, mode=Mode.SUBTRACT)
    # profile 8 of 9: a face of its own
    with BuildSketch(Plane.XY.offset(2)):
        with BuildLine():
            Line((53.913935689, 26.5), (57.086064311, 26.5))
            ThreePointArc((57.086064311, 26.5), (55.5, 26.88), (53.913935689, 26.5))
        make_face()
    # profile 9 of 9: a face of its own
    with BuildSketch(Plane.XY.offset(2)):
        with BuildLine():
            ThreePointArc((-25.463935689, 26.5), (-27.05, 26.88), (-28.636064311, 26.5))
            Line((-28.636064311, 26.5), (-25.463935689, 26.5))
        make_face()
    extrude(amount=BOSS_EXTRUDE11_DEPTH)

    # Sketch24 → Cut-Extrude10 (cut, two sides: drawn at the far end of the back side and taken through both)
    with BuildSketch(Plane.XY.offset(10).offset(-CUT_EXTRUDE10_DEPTH_BACK)):
        with Locations((-75.5, 19.5)):
            Rectangle(SKETCH24_W, SKETCH24_H)
        with Locations((-77.5, -88)):
            Rectangle(SKETCH24_W_2, SKETCH24_H_2)
        with Locations((-74, -36)):
            Rectangle(SKETCH24_W_3, SKETCH24_H_3)
    extrude(amount=CUT_EXTRUDE10_DEPTH + CUT_EXTRUDE10_DEPTH_BACK, mode=Mode.SUBTRACT)

    # Chamfer3
    chamfer3_edges = [part.edges().sort_by_distance(p)[0] for p in [
        (62.75, -56.5, 0),
        (68, -51.25, 0),
        (73.25, -56.5, 0),
        (68, -61.75, 0),
        (58.25, -56.5, 0),
        (53, -61.75, 0),
        (47.75, -56.5, 0),
        (53, -51.25, 0),
        (75.5, -32.5, 0),
        (15, 29.5, 0),
        (-105.5, -36, 0),
        (13, -94.5, 0),
        (-45.5, 19.5, 0),
        (-75.5, 9.5, 0),
        (-77.5, -81.5, 0),
        (-49.5, -88, 0),
        (-74, -75.5, 0),
        (-99.5, -36, 0),
        (-74, 3.5, 0),
        (-48.5, -36, 0),
    ]]
    chamfer(chamfer3_edges, length=CHAMFER3_SIZE)


solid = part.part
